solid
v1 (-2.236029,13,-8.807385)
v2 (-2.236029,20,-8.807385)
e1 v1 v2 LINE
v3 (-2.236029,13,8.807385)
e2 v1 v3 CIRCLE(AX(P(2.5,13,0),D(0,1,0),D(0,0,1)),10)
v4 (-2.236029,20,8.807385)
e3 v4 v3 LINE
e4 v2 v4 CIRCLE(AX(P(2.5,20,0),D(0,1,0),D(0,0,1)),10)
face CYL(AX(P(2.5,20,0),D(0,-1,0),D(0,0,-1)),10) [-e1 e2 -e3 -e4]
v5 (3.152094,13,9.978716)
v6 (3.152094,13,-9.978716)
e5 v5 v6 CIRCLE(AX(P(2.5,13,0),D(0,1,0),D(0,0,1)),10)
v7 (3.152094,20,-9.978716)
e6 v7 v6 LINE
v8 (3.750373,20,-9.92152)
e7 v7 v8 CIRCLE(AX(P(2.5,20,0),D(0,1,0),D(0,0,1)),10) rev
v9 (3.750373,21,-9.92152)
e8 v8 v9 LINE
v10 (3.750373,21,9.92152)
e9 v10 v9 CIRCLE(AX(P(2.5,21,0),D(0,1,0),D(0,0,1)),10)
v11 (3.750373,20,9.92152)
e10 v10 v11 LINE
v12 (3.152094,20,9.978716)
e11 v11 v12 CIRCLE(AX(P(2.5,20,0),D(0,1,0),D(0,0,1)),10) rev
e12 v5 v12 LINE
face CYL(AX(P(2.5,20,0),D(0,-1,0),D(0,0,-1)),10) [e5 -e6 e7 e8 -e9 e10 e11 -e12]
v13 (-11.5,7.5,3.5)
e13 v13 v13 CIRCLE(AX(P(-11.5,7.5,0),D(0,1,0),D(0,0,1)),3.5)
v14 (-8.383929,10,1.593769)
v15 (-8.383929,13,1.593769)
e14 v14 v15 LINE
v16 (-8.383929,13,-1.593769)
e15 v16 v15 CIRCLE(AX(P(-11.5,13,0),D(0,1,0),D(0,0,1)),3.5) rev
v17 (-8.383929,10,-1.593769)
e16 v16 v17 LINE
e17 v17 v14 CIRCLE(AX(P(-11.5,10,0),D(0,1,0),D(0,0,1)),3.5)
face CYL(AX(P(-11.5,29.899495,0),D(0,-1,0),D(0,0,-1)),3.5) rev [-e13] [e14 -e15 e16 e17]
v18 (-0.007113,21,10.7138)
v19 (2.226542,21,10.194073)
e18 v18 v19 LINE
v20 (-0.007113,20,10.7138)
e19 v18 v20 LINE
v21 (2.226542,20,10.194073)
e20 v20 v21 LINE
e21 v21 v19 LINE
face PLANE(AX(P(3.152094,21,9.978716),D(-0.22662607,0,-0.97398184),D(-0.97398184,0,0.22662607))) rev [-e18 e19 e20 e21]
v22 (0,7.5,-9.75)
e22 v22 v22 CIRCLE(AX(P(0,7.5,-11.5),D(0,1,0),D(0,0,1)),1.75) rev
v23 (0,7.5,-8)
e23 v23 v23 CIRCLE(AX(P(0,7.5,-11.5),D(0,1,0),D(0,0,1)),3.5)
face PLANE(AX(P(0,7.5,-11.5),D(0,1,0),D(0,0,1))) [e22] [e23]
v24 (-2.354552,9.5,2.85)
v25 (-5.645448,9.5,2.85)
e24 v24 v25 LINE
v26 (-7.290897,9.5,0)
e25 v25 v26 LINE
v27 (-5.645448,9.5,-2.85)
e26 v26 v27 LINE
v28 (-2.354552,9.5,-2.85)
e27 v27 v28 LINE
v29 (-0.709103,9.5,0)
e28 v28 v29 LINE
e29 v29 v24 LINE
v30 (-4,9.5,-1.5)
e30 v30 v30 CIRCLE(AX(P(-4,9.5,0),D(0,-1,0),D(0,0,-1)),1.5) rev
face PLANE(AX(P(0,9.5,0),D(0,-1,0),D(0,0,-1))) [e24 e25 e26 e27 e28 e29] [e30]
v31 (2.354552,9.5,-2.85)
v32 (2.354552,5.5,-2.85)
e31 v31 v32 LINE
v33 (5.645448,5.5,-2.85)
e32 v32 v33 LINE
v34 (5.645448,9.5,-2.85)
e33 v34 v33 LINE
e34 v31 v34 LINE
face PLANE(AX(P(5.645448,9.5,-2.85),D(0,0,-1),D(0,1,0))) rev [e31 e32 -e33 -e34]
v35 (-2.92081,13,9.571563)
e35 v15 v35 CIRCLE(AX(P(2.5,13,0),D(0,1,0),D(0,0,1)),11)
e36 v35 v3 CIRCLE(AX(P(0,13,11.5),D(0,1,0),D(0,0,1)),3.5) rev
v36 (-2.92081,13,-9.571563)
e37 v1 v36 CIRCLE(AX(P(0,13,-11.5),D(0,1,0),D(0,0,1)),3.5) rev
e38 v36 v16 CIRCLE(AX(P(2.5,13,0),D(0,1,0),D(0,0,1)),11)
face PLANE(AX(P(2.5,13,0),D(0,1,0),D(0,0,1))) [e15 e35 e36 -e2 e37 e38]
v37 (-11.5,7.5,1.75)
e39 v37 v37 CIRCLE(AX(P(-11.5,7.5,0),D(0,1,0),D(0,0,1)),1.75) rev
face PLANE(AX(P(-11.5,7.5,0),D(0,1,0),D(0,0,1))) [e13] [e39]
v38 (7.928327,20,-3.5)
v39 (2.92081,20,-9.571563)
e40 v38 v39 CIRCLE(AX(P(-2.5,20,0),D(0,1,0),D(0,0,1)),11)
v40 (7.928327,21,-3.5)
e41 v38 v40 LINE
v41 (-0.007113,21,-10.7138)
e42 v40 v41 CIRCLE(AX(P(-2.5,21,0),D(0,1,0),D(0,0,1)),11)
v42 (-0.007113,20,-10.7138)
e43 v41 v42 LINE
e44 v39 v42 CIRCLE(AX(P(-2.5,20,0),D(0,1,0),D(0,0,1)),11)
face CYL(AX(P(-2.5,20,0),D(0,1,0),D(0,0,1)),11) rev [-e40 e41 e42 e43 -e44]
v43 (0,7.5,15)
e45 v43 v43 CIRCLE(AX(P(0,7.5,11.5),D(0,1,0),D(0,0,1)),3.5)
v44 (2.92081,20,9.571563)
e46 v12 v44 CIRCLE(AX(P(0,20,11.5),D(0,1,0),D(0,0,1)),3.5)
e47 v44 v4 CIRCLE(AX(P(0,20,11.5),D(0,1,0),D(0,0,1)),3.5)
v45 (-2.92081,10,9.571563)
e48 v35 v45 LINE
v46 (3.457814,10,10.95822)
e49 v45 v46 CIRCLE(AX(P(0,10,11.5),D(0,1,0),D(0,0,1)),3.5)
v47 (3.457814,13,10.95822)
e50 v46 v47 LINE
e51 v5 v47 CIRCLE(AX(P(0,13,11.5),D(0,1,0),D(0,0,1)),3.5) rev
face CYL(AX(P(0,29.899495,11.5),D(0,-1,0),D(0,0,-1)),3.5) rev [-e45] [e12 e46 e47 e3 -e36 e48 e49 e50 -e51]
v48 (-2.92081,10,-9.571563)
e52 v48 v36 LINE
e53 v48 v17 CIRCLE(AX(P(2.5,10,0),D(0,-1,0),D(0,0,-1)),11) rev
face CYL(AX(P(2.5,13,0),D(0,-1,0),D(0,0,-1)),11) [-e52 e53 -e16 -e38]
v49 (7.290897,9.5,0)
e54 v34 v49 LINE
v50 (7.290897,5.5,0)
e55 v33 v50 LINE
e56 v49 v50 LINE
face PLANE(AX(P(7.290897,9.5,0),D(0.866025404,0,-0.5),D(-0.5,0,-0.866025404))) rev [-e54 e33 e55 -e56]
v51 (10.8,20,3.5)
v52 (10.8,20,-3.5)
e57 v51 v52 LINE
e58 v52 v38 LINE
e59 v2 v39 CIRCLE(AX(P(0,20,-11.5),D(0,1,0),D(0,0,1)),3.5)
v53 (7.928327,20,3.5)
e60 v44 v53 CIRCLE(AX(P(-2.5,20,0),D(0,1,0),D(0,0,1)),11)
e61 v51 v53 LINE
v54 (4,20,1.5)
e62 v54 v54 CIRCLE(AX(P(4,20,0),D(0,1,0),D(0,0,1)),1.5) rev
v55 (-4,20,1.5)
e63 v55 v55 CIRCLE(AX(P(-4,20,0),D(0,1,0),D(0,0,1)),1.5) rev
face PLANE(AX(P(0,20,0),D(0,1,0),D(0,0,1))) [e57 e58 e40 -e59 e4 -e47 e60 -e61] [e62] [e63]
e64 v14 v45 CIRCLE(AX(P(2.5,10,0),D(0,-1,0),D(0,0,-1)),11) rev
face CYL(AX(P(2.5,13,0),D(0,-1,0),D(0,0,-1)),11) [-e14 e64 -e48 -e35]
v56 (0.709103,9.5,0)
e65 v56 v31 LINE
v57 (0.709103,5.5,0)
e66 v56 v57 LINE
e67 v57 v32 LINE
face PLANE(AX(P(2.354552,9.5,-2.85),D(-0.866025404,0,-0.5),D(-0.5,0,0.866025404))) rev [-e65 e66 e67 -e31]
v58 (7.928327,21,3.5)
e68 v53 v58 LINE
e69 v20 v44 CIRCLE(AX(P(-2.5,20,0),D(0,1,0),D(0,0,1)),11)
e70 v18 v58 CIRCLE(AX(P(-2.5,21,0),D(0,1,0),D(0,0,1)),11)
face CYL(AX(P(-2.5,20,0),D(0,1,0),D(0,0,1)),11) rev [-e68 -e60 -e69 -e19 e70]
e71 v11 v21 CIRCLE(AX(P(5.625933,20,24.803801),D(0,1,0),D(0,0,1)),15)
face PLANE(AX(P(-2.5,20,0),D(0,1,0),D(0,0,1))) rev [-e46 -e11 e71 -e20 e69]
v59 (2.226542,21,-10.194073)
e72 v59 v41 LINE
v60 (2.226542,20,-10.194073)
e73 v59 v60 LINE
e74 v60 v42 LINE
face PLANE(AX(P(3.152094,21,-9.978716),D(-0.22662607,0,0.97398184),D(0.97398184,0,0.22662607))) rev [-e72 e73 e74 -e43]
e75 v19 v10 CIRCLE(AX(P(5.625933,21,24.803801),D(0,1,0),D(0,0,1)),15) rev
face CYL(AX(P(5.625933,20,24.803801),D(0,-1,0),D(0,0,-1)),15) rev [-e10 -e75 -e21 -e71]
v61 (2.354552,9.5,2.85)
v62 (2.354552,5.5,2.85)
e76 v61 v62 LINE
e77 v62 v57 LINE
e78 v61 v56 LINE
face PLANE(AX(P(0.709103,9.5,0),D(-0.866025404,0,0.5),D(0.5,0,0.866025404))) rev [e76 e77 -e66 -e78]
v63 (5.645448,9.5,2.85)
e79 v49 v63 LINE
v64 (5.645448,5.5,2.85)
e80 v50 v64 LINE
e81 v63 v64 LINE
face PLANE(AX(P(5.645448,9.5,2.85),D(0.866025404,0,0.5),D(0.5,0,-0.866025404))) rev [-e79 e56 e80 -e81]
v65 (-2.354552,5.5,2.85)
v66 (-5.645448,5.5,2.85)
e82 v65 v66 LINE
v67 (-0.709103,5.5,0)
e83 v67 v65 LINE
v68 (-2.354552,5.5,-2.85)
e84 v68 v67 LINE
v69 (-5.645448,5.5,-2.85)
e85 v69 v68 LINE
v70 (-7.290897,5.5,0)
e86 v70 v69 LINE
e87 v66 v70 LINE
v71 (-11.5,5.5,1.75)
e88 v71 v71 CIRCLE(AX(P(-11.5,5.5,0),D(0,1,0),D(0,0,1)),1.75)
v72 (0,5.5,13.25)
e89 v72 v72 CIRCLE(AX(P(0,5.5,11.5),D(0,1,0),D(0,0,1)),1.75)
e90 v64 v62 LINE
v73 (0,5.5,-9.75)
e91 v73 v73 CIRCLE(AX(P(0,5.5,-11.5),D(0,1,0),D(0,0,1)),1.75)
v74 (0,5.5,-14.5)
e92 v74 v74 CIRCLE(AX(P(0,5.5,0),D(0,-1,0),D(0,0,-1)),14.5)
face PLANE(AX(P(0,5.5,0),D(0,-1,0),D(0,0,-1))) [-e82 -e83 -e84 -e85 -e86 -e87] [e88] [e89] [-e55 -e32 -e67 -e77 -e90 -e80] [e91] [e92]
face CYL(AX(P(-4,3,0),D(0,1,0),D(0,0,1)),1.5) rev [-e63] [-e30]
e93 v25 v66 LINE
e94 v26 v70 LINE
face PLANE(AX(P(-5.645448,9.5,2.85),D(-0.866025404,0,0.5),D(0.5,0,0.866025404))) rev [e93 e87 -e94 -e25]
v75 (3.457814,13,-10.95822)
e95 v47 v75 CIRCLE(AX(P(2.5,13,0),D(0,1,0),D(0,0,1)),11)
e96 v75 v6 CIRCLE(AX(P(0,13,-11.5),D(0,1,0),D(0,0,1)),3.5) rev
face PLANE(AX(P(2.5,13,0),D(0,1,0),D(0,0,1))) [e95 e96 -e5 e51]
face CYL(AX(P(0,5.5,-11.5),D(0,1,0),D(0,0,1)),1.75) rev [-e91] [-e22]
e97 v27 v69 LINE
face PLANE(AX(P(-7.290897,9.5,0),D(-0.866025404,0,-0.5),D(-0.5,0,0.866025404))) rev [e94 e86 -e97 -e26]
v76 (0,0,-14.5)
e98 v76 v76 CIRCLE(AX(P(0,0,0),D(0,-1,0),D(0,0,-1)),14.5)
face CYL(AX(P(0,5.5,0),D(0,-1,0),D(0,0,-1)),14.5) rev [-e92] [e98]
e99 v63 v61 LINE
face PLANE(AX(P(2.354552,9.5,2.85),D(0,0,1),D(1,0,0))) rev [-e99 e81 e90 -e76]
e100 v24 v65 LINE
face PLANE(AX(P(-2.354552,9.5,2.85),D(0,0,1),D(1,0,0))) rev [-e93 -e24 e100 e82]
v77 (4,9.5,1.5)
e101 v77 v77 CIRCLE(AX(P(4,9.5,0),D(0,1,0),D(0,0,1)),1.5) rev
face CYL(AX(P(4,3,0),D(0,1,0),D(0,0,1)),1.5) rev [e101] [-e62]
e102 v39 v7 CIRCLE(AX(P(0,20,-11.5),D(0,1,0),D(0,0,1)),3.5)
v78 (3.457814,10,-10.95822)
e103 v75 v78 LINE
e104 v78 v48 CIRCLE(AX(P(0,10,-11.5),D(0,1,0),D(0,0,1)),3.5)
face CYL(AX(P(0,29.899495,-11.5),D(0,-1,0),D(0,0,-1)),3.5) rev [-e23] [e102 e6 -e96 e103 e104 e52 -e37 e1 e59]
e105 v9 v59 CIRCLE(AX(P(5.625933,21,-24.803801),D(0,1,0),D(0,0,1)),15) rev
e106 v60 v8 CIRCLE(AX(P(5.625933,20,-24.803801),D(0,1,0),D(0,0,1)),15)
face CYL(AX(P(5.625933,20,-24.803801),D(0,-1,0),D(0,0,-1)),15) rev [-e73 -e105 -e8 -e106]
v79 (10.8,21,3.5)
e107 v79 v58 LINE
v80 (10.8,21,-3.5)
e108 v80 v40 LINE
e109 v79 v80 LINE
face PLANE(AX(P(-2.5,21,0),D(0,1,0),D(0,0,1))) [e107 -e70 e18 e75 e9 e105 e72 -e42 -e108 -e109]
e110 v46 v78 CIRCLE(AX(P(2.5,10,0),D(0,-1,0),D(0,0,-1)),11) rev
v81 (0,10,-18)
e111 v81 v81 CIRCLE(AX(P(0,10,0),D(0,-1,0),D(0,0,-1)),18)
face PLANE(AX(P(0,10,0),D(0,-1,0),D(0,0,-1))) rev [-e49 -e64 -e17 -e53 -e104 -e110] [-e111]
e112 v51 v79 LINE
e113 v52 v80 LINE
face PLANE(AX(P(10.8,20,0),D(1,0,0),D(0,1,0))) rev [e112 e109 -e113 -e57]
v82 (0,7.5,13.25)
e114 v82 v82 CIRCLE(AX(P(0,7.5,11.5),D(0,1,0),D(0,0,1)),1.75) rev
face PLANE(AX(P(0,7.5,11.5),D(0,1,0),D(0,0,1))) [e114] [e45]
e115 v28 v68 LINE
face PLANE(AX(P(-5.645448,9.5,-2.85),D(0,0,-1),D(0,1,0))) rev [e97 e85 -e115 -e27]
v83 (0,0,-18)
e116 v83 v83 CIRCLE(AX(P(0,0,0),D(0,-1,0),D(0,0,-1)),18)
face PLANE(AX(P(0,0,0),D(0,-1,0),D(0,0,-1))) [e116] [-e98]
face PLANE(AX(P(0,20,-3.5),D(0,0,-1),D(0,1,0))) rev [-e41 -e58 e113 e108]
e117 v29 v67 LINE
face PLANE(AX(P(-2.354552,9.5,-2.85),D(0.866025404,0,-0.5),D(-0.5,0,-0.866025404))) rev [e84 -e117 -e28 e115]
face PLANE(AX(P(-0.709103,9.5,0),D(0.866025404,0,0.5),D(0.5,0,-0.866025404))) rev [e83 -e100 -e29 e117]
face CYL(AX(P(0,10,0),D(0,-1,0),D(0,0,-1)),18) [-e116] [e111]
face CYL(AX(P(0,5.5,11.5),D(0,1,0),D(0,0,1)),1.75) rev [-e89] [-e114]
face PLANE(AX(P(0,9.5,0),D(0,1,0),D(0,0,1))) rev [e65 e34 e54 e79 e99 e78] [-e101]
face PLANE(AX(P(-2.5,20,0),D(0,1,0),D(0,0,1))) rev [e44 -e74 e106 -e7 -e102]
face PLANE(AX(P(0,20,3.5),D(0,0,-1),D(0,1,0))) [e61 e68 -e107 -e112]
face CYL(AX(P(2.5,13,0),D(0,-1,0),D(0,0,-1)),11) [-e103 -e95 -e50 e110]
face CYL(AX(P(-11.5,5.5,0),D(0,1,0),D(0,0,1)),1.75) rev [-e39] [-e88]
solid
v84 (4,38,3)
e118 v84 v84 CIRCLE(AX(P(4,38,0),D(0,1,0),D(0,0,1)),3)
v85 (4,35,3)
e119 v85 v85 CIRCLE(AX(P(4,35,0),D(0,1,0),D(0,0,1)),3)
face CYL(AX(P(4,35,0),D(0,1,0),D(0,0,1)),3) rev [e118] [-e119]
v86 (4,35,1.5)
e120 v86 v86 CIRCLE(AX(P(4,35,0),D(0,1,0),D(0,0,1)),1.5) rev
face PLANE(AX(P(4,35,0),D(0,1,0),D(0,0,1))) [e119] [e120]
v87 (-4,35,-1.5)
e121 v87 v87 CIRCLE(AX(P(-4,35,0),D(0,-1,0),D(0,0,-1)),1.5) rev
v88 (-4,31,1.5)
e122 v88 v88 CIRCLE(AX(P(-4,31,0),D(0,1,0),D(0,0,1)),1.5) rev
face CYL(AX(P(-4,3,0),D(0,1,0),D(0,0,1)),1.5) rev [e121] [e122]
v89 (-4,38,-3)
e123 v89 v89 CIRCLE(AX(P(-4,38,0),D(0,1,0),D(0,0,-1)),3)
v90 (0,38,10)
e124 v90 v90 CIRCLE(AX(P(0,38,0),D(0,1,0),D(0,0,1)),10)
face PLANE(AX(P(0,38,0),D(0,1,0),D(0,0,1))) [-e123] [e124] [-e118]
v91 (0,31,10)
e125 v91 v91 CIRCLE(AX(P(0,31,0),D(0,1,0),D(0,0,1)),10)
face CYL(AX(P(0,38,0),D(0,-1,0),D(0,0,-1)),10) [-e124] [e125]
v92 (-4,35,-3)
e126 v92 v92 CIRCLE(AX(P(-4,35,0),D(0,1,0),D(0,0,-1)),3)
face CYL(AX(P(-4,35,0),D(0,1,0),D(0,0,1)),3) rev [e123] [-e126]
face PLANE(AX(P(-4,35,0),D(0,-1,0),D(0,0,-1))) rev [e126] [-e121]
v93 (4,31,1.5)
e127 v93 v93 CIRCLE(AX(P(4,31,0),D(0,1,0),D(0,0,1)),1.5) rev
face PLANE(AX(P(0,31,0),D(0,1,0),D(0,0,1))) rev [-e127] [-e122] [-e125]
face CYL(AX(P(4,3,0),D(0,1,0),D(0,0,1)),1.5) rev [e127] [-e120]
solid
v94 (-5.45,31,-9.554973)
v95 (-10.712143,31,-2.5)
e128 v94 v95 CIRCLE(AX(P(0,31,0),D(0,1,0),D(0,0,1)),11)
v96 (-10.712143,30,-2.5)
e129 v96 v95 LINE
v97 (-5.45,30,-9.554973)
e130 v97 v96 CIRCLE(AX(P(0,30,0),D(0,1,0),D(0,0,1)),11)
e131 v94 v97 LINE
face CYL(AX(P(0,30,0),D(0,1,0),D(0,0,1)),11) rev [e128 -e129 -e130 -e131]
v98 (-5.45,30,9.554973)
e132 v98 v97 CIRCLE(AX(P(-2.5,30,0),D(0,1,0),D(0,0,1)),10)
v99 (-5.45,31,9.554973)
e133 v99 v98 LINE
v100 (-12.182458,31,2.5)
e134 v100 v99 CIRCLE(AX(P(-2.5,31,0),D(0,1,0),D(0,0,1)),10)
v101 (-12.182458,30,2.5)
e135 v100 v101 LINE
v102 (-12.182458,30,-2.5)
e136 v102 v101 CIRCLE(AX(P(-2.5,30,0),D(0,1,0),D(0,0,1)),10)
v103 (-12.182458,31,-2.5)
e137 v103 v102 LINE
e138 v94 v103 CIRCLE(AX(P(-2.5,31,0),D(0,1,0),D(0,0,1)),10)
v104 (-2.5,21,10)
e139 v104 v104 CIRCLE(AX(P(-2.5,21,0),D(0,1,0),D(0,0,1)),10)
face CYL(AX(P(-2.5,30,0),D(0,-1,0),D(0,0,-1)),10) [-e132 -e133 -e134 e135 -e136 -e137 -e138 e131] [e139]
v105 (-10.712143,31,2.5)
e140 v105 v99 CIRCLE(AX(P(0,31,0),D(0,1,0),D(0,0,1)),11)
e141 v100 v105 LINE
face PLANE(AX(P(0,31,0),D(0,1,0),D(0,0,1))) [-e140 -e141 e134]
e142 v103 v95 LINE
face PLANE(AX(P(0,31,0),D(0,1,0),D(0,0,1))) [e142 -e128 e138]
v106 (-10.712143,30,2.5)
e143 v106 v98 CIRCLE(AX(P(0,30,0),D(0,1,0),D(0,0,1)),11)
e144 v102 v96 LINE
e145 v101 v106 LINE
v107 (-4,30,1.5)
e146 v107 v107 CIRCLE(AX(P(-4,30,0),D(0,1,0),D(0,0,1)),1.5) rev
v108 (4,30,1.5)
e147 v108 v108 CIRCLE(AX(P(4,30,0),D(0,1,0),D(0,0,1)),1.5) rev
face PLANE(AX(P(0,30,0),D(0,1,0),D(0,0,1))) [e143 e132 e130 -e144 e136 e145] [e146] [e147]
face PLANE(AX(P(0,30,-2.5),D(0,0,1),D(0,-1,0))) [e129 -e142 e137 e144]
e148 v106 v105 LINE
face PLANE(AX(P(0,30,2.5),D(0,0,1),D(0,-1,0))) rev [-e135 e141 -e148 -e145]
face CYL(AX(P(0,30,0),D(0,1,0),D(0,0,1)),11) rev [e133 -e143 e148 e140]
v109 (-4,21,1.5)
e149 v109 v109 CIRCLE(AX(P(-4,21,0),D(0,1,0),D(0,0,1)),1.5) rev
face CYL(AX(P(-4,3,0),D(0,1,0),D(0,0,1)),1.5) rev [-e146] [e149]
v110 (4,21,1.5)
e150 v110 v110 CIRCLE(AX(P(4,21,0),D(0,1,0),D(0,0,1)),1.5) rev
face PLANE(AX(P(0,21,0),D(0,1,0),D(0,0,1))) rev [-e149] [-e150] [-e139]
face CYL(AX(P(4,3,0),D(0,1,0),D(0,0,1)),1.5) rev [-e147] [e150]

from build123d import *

# Parameters (mm, degrees)
SKETCH2_R           = 18
BOSS_EXTRUDE1_DEPTH = 10
SKETCH3_R           = 10
BOSS_EXTRUDE2_DEPTH = 10
SKETCH4_R           = 10
BOSS_EXTRUDE3_DEPTH = 10
SKETCH5_R           = 10
BOSS_EXTRUDE4_DEPTH = 8
SKETCH7_R           = 11
SKETCH7_R_2         = 10
BOSS_EXTRUDE5_DEPTH = 3
SKETCH8_R           = 11.000000000518183
SKETCH8_R_2         = 10.000000000518181
BOSS_EXTRUDE6_DEPTH = 1
SKETCH9_R           = 11
SKETCH9_R_2         = 2
BOSS_EXTRUDE7_DEPTH = 1
SKETCH11_R          = 1.4999999999999996
CUT_EXTRUDE4_DEPTH  = 35
SKETCH12_R          = 14.499999999998145
CUT_EXTRUDE5_DEPTH  = 5.5
SKETCH14_R          = 1.75
SKETCH14_R_2        = 1.7499999999999993
SKETCH14_R_3        = 1.7499999999999996
CUT_EXTRUDE6_DEPTH  = 4.5
CUT_EXTRUDE7_REACH  = 39.842
SKETCH15_R          = 3.5
SKETCH15_R_2        = 3.4999999999999996
CUT_EXTRUDE8_START  = -2.5
SKETCH15_2_R        = 3.5
SKETCH15_2_R_2      = 3.4999999999999996
CUT_EXTRUDE8_DEPTH  = 2.5
BOSS_EXTRUDE8_DEPTH = 1
CUT_EXTRUDE11_DEPTH = 4
SKETCH19_R          = 3
CUT_EXTRUDE12_DEPTH = 3
FILLET1_R           = 15
BOSS_EXTRUDE9_DEPTH = 1
CUT_EXTRUDE14_START = -1
SKETCH21_R          = 10.000000000518181
CUT_EXTRUDE14_DEPTH = 1
CUT_EXTRUDE18_DEPTH = 1


with BuildPart() as part:
    # Sketch2 → Boss-Extrude1 (new body)
    with BuildSketch(Plane.XZ):
        with Locations(Location((0, 0, 0), (0, 0, 270))):
            Circle(SKETCH2_R)
    extrude(amount=-BOSS_EXTRUDE1_DEPTH)

    # Sketch3 → Boss-Extrude2 (add)
    with BuildSketch(Plane(origin=(0, 10, 0), x_dir=(1, 0, 0), z_dir=(0, 1, 0))):
        with Locations(Location((2.5, 0, 0), (0, 0, 270))):
            Circle(SKETCH3_R)
    extrude(amount=BOSS_EXTRUDE2_DEPTH)

    # Sketch4 → Boss-Extrude3 (add)
    with BuildSketch(Plane(origin=(0, 20, 0), x_dir=(1, 0, 0), z_dir=(0, 1, 0))):
        with Locations(Location((-2.5000000000000004, 0, 0), (0, 0, 75.522487814))):
            Circle(SKETCH4_R)
    extrude(amount=BOSS_EXTRUDE3_DEPTH)

    # Sketch5 → Boss-Extrude4 (add)
    with BuildSketch(Plane(origin=(0, 30, 0), x_dir=(1, 0, 0), z_dir=(0, 1, 0))):
        with Locations(Location((0, 0, 0), (0, 0, 97.180755781))):
            Circle(SKETCH5_R)
    extrude(amount=BOSS_EXTRUDE4_DEPTH)

    # Sketch7 → Boss-Extrude5 (add)
    with BuildSketch(Plane(origin=(0, 10, 0), x_dir=(1, 0, 0), z_dir=(0, 1, 0))):
        with Locations(Location((2.5, 0, 0), (0, 0, 90))):
            Circle(SKETCH7_R)
        with Locations(Location((2.5, 0, 0), (0, 0, 104.477512186))):
            Circle(SKETCH7_R_2, mode=Mode.SUBTRACT)
    extrude(amount=BOSS_EXTRUDE5_DEPTH)

    # Sketch8 → Boss-Extrude6 (add)
    with BuildSketch(Plane(origin=(0, 20, 0), x_dir=(1, 0, 0), z_dir=(0, 1, 0))):
        with Locations(Location((-2.5000000000000004, 0, 0), (0, 0, 65.280148812))):
            Circle(SKETCH8_R)
        with Locations(Location((-2.5000000000000004, 0, 0), (0, 0, 82.819244219))):
            Circle(SKETCH8_R_2, mode=Mode.SUBTRACT)
    extrude(amount=BOSS_EXTRUDE6_DEPTH)

    # Sketch9 → Boss-Extrude7 (add)
    with BuildSketch(Plane(origin=(0, 30, 0), x_dir=(1, 0, 0), z_dir=(0, 1, 0))):
        with Locations(Location((0, 0, 0), (0, 0, 119.699728045))):
            Circle(SKETCH9_R)
        Circle(SKETCH9_R_2, mode=Mode.SUBTRACT)
    extrude(amount=BOSS_EXTRUDE7_DEPTH)

    # Sketch11 → Cut-Extrude4 (cut)
    with BuildSketch(Plane(origin=(0, 38, 0), x_dir=(1, 0, 0), z_dir=(0, 1, 0))):
        with Locations(Location((4, 0, 0), (0, 0, 270))):
            Circle(SKETCH11_R)
        with Locations(Location((-4, 0, 0), (0, 0, 90))):
            Circle(SKETCH11_R)
    extrude(amount=-CUT_EXTRUDE4_DEPTH, mode=Mode.SUBTRACT)

    # Sketch12 → Cut-Extrude5 (cut)
    with BuildSketch(Plane(origin=(0, 0, 0), x_dir=(-1, 0, 0), z_dir=(0, -1, 0))):
        with Locations(Location((0, 0, 0), (0, 0, 90))):
            Circle(SKETCH12_R)
    extrude(amount=-CUT_EXTRUDE5_DEPTH, mode=Mode.SUBTRACT)

    # Sketch14 → Cut-Extrude6 (cut)
    with BuildSketch(Plane(origin=(0, 10, 0), x_dir=(1, 0, 0), z_dir=(0, 1, 0))):
        with Locations(Location((-11.5, 2.65611e-12, 0), (0, 0, 270))):
            Circle(SKETCH14_R)
        with Locations(Location((0, -11.5, 0), (0, 0, 270))):
            Circle(SKETCH14_R_2)
        with Locations(Location((-4.23e-15, 11.5, 0), (0, 0, 270))):
            Circle(SKETCH14_R_3)
    extrude(amount=-CUT_EXTRUDE6_DEPTH, mode=Mode.SUBTRACT)

    # Cut-Extrude7: up to this face of the body (flat: up to its plane)
    cut_extrude7_end = Plane(part.part.faces().sort_by_distance((8.77903562, 20, 0))[0])
    # Sketch15 → Cut-Extrude7 (cut, up to the picked face)
    with BuildSketch(Plane(origin=(0, 10, 0), x_dir=(1, 0, 0), z_dir=(0, 1, 0)), mode=Mode.PRIVATE) as cut_extrude7_sk1:
        with Locations((-11.5, 2.65611e-12)):
            Circle(SKETCH15_R)
    cut_extrude7_tool1 = split(extrude(cut_extrude7_sk1.sketch, amount=CUT_EXTRUDE7_REACH, mode=Mode.PRIVATE), bisect_by=cut_extrude7_end, keep=Keep.BOTH, mode=Mode.PRIVATE)
    # Sketch15 → Cut-Extrude7 (cut, up to the picked face)
    with BuildSketch(Plane(origin=(0, 10, 0), x_dir=(1, 0, 0), z_dir=(0, 1, 0)), mode=Mode.PRIVATE) as cut_extrude7_sk2:
        with Locations((0, -11.5)):
            Circle(SKETCH15_R_2)
    cut_extrude7_tool2 = split(extrude(cut_extrude7_sk2.sketch, amount=CUT_EXTRUDE7_REACH, mode=Mode.PRIVATE), bisect_by=cut_extrude7_end, keep=Keep.BOTH, mode=Mode.PRIVATE)
    # Sketch15 → Cut-Extrude7 (cut, up to the picked face)
    with BuildSketch(Plane(origin=(0, 10, 0), x_dir=(1, 0, 0), z_dir=(0, 1, 0)), mode=Mode.PRIVATE) as cut_extrude7_sk3:
        with Locations((-4.23e-15, 11.5)):
            Circle(SKETCH15_R_2)
    cut_extrude7_tool3 = split(extrude(cut_extrude7_sk3.sketch, amount=CUT_EXTRUDE7_REACH, mode=Mode.PRIVATE), bisect_by=cut_extrude7_end, keep=Keep.BOTH, mode=Mode.PRIVATE)
    add(cut_extrude7_tool1.solids().sort_by(Axis((-11.5, 10, 0), (0, 1, 0)))[0], mode=Mode.SUBTRACT)
    add(cut_extrude7_tool2.solids().sort_by(Axis((0, 10, 11.5), (0, 1, 0)))[0], mode=Mode.SUBTRACT)
    add(cut_extrude7_tool3.solids().sort_by(Axis((0, 10, -11.5), (0, 1, 0)))[0], mode=Mode.SUBTRACT)

    # Sketch15<2> → Cut-Extrude8 (cut)
    with BuildSketch(Plane(origin=(0, 10, 0), x_dir=(1, 0, 0), z_dir=(0, 1, 0)).offset(CUT_EXTRUDE8_START)):
        with Locations(Location((-11.5, 2.65611e-12, 0), (0, 0, 27.088260677))):
            Circle(SKETCH15_2_R)
        with Locations(Location((0, -11.5, 0), (0, 0, 129.707264673))):
            Circle(SKETCH15_2_R_2)
        with Locations(Location((-4.23e-15, 11.5, 0), (0, 0, 351.09514002))):
            Circle(SKETCH15_2_R_2)
    extrude(amount=CUT_EXTRUDE8_DEPTH, mode=Mode.SUBTRACT)

    # Sketch16 → Boss-Extrude8 (add)
    with BuildSketch(Plane(origin=(0, 20, 0), x_dir=(1, 0, 0), z_dir=(0, 1, 0))):
        with BuildLine():
            Line((3.152093764490977, -9.97871603575891), (-0.00711323202179414, -10.713800239571357))
            ThreePointArc((-0.00711323202179414, -10.713800239571357), (1.497852610504287, -10.24778876226887), (2.920809977624914, -9.571563048838062))
            ThreePointArc((2.920809977624914, -9.571563048838062), (8.500000000518181, 2.44e-15), (2.920809977624908, 9.571563048838065))
            ThreePointArc((2.920809977624908, 9.571563048838065), (1.4978526105042804, 10.247788762268867), (-0.00711323202179414, 10.713800239571357))
            Line((-0.00711323202179414, 10.713800239571357), (3.152093764490974, 9.978716035758909))
            ThreePointArc((3.152093764490974, 9.978716035758909), (12.500000000000002, 2.22e-15), (3.152093764490977, -9.97871603575891))
        make_face()
    extrude(amount=BOSS_EXTRUDE8_DEPTH)

    # Sketch18 → Cut-Extrude11 (cut)
    with BuildSketch(Plane.XZ.offset(-5.5)):
        Polygon((-0.7091034656191317, 4.3e-16), (-2.3545517328095666, 2.8500000000000005), (-5.645448267190433, 2.85), (-7.290896534380867, 8.7e-16), (-5.6454482671904325, -2.8499999999999996), (-2.3545517328095644, -2.8499999999999996), align=None)
        Polygon((2.3545517328095644, -2.8499999999999996), (0.7091034656191317, 4.3e-16), (2.3545517328095666, 2.8500000000000005), (5.645448267190433, 2.85), (7.290896534380867, 8.7e-16), (5.6454482671904325, -2.8499999999999996), align=None)
    extrude(amount=-CUT_EXTRUDE11_DEPTH, mode=Mode.SUBTRACT)

    # Sketch19 → Cut-Extrude12 (cut)
    with BuildSketch(Plane(origin=(0, 38, 0), x_dir=(1, 0, 0), z_dir=(0, 1, 0))):
        with Locations(Location((4, 0, 0), (0, 0, 270))):
            Circle(SKETCH19_R)
        with Locations(Location((-4, 0, 0), (0, 0, 90))):
            Circle(SKETCH19_R)
    extrude(amount=-CUT_EXTRUDE12_DEPTH, mode=Mode.SUBTRACT)

    # Fillet1
    fillet1_edges = [part.edges().sort_by_distance(p)[0] for p in [
        (3.1520937644909774, 20.5, 9.97871603575891),
        (3.152093764490974, 20.5, -9.978716035758909),
    ]]
    fillet(fillet1_edges, radius=FILLET1_R)

    # Sketch20 → Boss-Extrude9 (add)
    with BuildSketch(Plane(origin=(0, 30, 0), x_dir=(1, 0, 0), z_dir=(0, 1, 0))):
        with BuildLine():
            ThreePointArc((-5.449999999999782, 9.554972527433101), (-5.980461913283042, 9.37477385701576), (-6.4999999999999964, 9.165151389911681))
            ThreePointArc((-6.4999999999999964, 9.165151389911681), (-12.5, 1.22e-15), (-6.5, -9.16515138991168))
            ThreePointArc((-6.5, -9.16515138991168), (-5.980461913282982, -9.374773857015782), (-5.449999999999655, -9.55497252743314))
            ThreePointArc((-5.449999999999692, -9.55497252743321), (-11, -6.216e-14), (-5.4499999999998, 9.554972527433147))
        make_face()
    extrude(amount=BOSS_EXTRUDE9_DEPTH)

    # Sketch21 → Cut-Extrude14 (cut)
    # profile 1 of 4: a face of its own
    with BuildSketch(Plane(origin=(0, 21, 0), x_dir=(1, 0, 0), z_dir=(0, 1, 0)).offset(CUT_EXTRUDE14_START)):
        with BuildLine():
            ThreePointArc((-0.00711323213923043, -10.713800239066654), (4.899268108135082, -8.139461374313111), (7.928326807307091, -3.500000000000044))
            Line((7.9283268073070765, -3.4999999999999996), (7.8000000000000025, -3.4999999999999996))
            Line((7.8000000000000025, -3.4999999999999996), (7.8000000000000025, 3.5000000000000004))
            Line((7.8000000000000025, 3.5000000000000004), (7.928326807307082, 3.5000000000000004))
            ThreePointArc((7.9283268073070925, 3.5000000000000395), (4.899268108135083, 8.13946137431311), (-0.00711323213922821, 10.713800239066654))
            ThreePointArc((-0.00711323202179459, 10.713800239571356), (-13.500000000518186, -1.33e-15), (-0.00711323202179193, -10.713800239571356))
        make_face()
        with Locations(Location((-2.5000000000000004, 0, 0), (0, 0, 107.157537372))):
            Circle(SKETCH21_R, mode=Mode.SUBTRACT)
    # profile 2 of 4: a face of its own
    with BuildSketch(Plane(origin=(0, 21, 0), x_dir=(1, 0, 0), z_dir=(0, 1, 0)).offset(CUT_EXTRUDE14_START)):
        with Locations(Location((-2.5000000000000004, 0, 0), (0, 0, 107.157537372))):
            Circle(SKETCH21_R)
    # profile 3 of 4: a face of its own
    with BuildSketch(Plane(origin=(0, 21, 0), x_dir=(1, 0, 0), z_dir=(0, 1, 0)).offset(CUT_EXTRUDE14_START)):
        with BuildLine():
            Line((7.9283268073070765, -3.4999999999999996), (10.8, -3.4999999999999996))
            Line((10.8, -3.4999999999999996), (10.8, 3.5000000000000004))
            Line((10.8, 3.5000000000000004), (7.928326807307082, 3.5000000000000004))
            ThreePointArc((7.9283268073070925, 3.5000000000000395), (8.35614100130378, 1.7731899390113273), (8.5, 0))
            ThreePointArc((8.5, -2.69e-15), (8.356141001303778, -1.773189939011331), (7.928326807307091, -3.500000000000044))
        make_face()
    # profile 4 of 4: a face of its own
    with BuildSketch(Plane(origin=(0, 21, 0), x_dir=(1, 0, 0), z_dir=(0, 1, 0)).offset(CUT_EXTRUDE14_START)):
        with BuildLine():
            Line((7.8000000000000025, -3.4999999999999996), (7.9283268073070765, -3.4999999999999996))
            ThreePointArc((7.928326807307091, -3.500000000000044), (8.356141001303778, -1.773189939011331), (8.5, -2.69e-15))
            ThreePointArc((8.5, 0), (8.35614100130378, 1.7731899390113273), (7.9283268073070925, 3.5000000000000395))
            Line((7.928326807307082, 3.5000000000000004), (7.8000000000000025, 3.5000000000000004))
            Line((7.8000000000000025, 3.5000000000000004), (7.8000000000000025, -3.4999999999999996))
        make_face()
    extrude(amount=CUT_EXTRUDE14_DEPTH, mode=Mode.SUBTRACT)


with BuildPart() as cut_extrude14_piece_1:
    # of the separate pieces the step leaves, piece 1, a body of its own (cut_extrude14_pieces)
    add(part.part.solids().sort_by_distance((2.226542235, 20, -10.194073342))[0])


with BuildPart() as cut_extrude14_piece_2:
    # of the separate pieces the step leaves, piece 2, a body of its own (cut_extrude14_pieces)
    add(part.part.solids().sort_by_distance((0, 21, -9.682458366))[0])

    # Sketch23 → Cut-Extrude18 (cut)
    with BuildSketch(Plane(origin=(0, 31, 0), x_dir=(1, 0, 0), z_dir=(0, 1, 0))):
        with BuildLine():
            Line((-12.748595347570808, 2.5000000000000004), (-12.748595347570808, -2.4999999999999996))
            Line((-12.748595347570808, -2.4999999999999996), (-12.182458365518658, -2.4999999999999996))
            ThreePointArc((-12.182458365518606, -2.499999999999765), (-12.5, 8.9e-16), (-12.182458365518604, 2.4999999999997686))
            Line((-12.182458365518656, 2.5000000000000004), (-12.748595347570808, 2.5000000000000004))
        make_face()
        with BuildLine():
            ThreePointArc((-12.182458365518604, 2.4999999999997686), (-12.5, 8.9e-16), (-12.182458365518606, -2.499999999999765))
            Line((-12.182458365518658, -2.4999999999999996), (-10.712142642814314, -2.4999999999999996))
            ThreePointArc((-10.712142642814296, -2.499999999999912), (-11, 1.35e-15), (-10.712142642814294, 2.4999999999999147))
            Line((-10.712142642814314, 2.5000000000000004), (-12.182458365518656, 2.5000000000000004))
        make_face()
        with BuildLine():
            ThreePointArc((-10.712142642814294, 2.4999999999999147), (-11, 1.35e-15), (-10.712142642814296, -2.499999999999912))
            Line((-10.712142642814314, -2.4999999999999996), (-9.682458365518459, -2.4999999999999996))
            ThreePointArc((-9.682458365518498, -2.5000000000001723), (-10, 1.22e-15), (-9.682458365518498, 2.500000000000175))
            Line((-9.682458365518459, 2.5000000000000004), (-10.712142642814314, 2.5000000000000004))
        make_face()
        with BuildLine():
            Line((-9.682458365518459, -2.4999999999999996), (-10.712142642814314, -2.4999999999999996))
            ThreePointArc((-10.712142642814296, -2.499999999999912), (-8.817418728991951, -6.576710952871652), (-5.4499999999999975, -9.554972527433033))
            ThreePointArc((-5.4499999999999975, -9.554972527433033), (5.524943438624508, -9.511834733635778), (11, -2.69e-15))
            ThreePointArc((11, 0), (5.5249434386245095, 9.511834733635776), (-5.449999999999995, 9.554972527433035))
            ThreePointArc((-5.449999999999995, 9.554972527433035), (-8.81741872899195, 6.576710952871655), (-10.712142642814294, 2.4999999999999147))
            Line((-10.712142642814314, 2.5000000000000004), (-9.682458365518459, 2.5000000000000004))
            ThreePointArc((-9.682458365518498, 2.500000000000175), (1.2600429248273706, 9.920296962671657), (10, 0))
            ThreePointArc((10, -2.45e-15), (1.2600429248273637, -9.920296962671657), (-9.682458365518498, -2.5000000000001723))
        make_face()
        with BuildLine():
            ThreePointArc((-9.682458365518498, 2.500000000000175), (-10, 1.22e-15), (-9.682458365518498, -2.5000000000001723))
            Line((-9.682458365518459, -2.4999999999999996), (-9.251404652429192, -2.4999999999999996))
            Line((-9.251404652429192, -2.4999999999999996), (-9.251404652429192, 2.5000000000000004))
            Line((-9.251404652429192, 2.5000000000000004), (-9.682458365518459, 2.5000000000000004))
        make_face()
        with BuildLine():
            Line((-9.251404652429192, -2.4999999999999996), (-9.682458365518459, -2.4999999999999996))
            ThreePointArc((-9.682458365518498, -2.5000000000001723), (1.2600429248273637, -9.920296962671657), (10, -2.45e-15))
            ThreePointArc((10, 0), (1.2600429248273706, 9.920296962671657), (-9.682458365518498, 2.500000000000175))
            Line((-9.682458365518459, 2.5000000000000004), (-9.251404652429192, 2.5000000000000004))
            Line((-9.251404652429192, 2.5000000000000004), (-9.251404652429192, -2.4999999999999996))
        make_face()
    extrude(amount=-CUT_EXTRUDE18_DEPTH, mode=Mode.SUBTRACT)


with BuildPart() as cut_extrude18_piece_1:
    # of the separate pieces the step leaves, piece 1, a body of its own (cut_extrude18_pieces)
    add(cut_extrude14_piece_2.part.solids().sort_by_distance((0, 21, -9.682458366))[0])


with BuildPart() as cut_extrude18_piece_2:
    # of the separate pieces the step leaves, piece 2, a body of its own (cut_extrude18_pieces)
    add(cut_extrude14_piece_2.part.solids().sort_by_distance((-4, 35, -1.5))[0])


solid = Compound([cut_extrude14_piece_1.part, cut_extrude18_piece_1.part, cut_extrude18_piece_2.part])
